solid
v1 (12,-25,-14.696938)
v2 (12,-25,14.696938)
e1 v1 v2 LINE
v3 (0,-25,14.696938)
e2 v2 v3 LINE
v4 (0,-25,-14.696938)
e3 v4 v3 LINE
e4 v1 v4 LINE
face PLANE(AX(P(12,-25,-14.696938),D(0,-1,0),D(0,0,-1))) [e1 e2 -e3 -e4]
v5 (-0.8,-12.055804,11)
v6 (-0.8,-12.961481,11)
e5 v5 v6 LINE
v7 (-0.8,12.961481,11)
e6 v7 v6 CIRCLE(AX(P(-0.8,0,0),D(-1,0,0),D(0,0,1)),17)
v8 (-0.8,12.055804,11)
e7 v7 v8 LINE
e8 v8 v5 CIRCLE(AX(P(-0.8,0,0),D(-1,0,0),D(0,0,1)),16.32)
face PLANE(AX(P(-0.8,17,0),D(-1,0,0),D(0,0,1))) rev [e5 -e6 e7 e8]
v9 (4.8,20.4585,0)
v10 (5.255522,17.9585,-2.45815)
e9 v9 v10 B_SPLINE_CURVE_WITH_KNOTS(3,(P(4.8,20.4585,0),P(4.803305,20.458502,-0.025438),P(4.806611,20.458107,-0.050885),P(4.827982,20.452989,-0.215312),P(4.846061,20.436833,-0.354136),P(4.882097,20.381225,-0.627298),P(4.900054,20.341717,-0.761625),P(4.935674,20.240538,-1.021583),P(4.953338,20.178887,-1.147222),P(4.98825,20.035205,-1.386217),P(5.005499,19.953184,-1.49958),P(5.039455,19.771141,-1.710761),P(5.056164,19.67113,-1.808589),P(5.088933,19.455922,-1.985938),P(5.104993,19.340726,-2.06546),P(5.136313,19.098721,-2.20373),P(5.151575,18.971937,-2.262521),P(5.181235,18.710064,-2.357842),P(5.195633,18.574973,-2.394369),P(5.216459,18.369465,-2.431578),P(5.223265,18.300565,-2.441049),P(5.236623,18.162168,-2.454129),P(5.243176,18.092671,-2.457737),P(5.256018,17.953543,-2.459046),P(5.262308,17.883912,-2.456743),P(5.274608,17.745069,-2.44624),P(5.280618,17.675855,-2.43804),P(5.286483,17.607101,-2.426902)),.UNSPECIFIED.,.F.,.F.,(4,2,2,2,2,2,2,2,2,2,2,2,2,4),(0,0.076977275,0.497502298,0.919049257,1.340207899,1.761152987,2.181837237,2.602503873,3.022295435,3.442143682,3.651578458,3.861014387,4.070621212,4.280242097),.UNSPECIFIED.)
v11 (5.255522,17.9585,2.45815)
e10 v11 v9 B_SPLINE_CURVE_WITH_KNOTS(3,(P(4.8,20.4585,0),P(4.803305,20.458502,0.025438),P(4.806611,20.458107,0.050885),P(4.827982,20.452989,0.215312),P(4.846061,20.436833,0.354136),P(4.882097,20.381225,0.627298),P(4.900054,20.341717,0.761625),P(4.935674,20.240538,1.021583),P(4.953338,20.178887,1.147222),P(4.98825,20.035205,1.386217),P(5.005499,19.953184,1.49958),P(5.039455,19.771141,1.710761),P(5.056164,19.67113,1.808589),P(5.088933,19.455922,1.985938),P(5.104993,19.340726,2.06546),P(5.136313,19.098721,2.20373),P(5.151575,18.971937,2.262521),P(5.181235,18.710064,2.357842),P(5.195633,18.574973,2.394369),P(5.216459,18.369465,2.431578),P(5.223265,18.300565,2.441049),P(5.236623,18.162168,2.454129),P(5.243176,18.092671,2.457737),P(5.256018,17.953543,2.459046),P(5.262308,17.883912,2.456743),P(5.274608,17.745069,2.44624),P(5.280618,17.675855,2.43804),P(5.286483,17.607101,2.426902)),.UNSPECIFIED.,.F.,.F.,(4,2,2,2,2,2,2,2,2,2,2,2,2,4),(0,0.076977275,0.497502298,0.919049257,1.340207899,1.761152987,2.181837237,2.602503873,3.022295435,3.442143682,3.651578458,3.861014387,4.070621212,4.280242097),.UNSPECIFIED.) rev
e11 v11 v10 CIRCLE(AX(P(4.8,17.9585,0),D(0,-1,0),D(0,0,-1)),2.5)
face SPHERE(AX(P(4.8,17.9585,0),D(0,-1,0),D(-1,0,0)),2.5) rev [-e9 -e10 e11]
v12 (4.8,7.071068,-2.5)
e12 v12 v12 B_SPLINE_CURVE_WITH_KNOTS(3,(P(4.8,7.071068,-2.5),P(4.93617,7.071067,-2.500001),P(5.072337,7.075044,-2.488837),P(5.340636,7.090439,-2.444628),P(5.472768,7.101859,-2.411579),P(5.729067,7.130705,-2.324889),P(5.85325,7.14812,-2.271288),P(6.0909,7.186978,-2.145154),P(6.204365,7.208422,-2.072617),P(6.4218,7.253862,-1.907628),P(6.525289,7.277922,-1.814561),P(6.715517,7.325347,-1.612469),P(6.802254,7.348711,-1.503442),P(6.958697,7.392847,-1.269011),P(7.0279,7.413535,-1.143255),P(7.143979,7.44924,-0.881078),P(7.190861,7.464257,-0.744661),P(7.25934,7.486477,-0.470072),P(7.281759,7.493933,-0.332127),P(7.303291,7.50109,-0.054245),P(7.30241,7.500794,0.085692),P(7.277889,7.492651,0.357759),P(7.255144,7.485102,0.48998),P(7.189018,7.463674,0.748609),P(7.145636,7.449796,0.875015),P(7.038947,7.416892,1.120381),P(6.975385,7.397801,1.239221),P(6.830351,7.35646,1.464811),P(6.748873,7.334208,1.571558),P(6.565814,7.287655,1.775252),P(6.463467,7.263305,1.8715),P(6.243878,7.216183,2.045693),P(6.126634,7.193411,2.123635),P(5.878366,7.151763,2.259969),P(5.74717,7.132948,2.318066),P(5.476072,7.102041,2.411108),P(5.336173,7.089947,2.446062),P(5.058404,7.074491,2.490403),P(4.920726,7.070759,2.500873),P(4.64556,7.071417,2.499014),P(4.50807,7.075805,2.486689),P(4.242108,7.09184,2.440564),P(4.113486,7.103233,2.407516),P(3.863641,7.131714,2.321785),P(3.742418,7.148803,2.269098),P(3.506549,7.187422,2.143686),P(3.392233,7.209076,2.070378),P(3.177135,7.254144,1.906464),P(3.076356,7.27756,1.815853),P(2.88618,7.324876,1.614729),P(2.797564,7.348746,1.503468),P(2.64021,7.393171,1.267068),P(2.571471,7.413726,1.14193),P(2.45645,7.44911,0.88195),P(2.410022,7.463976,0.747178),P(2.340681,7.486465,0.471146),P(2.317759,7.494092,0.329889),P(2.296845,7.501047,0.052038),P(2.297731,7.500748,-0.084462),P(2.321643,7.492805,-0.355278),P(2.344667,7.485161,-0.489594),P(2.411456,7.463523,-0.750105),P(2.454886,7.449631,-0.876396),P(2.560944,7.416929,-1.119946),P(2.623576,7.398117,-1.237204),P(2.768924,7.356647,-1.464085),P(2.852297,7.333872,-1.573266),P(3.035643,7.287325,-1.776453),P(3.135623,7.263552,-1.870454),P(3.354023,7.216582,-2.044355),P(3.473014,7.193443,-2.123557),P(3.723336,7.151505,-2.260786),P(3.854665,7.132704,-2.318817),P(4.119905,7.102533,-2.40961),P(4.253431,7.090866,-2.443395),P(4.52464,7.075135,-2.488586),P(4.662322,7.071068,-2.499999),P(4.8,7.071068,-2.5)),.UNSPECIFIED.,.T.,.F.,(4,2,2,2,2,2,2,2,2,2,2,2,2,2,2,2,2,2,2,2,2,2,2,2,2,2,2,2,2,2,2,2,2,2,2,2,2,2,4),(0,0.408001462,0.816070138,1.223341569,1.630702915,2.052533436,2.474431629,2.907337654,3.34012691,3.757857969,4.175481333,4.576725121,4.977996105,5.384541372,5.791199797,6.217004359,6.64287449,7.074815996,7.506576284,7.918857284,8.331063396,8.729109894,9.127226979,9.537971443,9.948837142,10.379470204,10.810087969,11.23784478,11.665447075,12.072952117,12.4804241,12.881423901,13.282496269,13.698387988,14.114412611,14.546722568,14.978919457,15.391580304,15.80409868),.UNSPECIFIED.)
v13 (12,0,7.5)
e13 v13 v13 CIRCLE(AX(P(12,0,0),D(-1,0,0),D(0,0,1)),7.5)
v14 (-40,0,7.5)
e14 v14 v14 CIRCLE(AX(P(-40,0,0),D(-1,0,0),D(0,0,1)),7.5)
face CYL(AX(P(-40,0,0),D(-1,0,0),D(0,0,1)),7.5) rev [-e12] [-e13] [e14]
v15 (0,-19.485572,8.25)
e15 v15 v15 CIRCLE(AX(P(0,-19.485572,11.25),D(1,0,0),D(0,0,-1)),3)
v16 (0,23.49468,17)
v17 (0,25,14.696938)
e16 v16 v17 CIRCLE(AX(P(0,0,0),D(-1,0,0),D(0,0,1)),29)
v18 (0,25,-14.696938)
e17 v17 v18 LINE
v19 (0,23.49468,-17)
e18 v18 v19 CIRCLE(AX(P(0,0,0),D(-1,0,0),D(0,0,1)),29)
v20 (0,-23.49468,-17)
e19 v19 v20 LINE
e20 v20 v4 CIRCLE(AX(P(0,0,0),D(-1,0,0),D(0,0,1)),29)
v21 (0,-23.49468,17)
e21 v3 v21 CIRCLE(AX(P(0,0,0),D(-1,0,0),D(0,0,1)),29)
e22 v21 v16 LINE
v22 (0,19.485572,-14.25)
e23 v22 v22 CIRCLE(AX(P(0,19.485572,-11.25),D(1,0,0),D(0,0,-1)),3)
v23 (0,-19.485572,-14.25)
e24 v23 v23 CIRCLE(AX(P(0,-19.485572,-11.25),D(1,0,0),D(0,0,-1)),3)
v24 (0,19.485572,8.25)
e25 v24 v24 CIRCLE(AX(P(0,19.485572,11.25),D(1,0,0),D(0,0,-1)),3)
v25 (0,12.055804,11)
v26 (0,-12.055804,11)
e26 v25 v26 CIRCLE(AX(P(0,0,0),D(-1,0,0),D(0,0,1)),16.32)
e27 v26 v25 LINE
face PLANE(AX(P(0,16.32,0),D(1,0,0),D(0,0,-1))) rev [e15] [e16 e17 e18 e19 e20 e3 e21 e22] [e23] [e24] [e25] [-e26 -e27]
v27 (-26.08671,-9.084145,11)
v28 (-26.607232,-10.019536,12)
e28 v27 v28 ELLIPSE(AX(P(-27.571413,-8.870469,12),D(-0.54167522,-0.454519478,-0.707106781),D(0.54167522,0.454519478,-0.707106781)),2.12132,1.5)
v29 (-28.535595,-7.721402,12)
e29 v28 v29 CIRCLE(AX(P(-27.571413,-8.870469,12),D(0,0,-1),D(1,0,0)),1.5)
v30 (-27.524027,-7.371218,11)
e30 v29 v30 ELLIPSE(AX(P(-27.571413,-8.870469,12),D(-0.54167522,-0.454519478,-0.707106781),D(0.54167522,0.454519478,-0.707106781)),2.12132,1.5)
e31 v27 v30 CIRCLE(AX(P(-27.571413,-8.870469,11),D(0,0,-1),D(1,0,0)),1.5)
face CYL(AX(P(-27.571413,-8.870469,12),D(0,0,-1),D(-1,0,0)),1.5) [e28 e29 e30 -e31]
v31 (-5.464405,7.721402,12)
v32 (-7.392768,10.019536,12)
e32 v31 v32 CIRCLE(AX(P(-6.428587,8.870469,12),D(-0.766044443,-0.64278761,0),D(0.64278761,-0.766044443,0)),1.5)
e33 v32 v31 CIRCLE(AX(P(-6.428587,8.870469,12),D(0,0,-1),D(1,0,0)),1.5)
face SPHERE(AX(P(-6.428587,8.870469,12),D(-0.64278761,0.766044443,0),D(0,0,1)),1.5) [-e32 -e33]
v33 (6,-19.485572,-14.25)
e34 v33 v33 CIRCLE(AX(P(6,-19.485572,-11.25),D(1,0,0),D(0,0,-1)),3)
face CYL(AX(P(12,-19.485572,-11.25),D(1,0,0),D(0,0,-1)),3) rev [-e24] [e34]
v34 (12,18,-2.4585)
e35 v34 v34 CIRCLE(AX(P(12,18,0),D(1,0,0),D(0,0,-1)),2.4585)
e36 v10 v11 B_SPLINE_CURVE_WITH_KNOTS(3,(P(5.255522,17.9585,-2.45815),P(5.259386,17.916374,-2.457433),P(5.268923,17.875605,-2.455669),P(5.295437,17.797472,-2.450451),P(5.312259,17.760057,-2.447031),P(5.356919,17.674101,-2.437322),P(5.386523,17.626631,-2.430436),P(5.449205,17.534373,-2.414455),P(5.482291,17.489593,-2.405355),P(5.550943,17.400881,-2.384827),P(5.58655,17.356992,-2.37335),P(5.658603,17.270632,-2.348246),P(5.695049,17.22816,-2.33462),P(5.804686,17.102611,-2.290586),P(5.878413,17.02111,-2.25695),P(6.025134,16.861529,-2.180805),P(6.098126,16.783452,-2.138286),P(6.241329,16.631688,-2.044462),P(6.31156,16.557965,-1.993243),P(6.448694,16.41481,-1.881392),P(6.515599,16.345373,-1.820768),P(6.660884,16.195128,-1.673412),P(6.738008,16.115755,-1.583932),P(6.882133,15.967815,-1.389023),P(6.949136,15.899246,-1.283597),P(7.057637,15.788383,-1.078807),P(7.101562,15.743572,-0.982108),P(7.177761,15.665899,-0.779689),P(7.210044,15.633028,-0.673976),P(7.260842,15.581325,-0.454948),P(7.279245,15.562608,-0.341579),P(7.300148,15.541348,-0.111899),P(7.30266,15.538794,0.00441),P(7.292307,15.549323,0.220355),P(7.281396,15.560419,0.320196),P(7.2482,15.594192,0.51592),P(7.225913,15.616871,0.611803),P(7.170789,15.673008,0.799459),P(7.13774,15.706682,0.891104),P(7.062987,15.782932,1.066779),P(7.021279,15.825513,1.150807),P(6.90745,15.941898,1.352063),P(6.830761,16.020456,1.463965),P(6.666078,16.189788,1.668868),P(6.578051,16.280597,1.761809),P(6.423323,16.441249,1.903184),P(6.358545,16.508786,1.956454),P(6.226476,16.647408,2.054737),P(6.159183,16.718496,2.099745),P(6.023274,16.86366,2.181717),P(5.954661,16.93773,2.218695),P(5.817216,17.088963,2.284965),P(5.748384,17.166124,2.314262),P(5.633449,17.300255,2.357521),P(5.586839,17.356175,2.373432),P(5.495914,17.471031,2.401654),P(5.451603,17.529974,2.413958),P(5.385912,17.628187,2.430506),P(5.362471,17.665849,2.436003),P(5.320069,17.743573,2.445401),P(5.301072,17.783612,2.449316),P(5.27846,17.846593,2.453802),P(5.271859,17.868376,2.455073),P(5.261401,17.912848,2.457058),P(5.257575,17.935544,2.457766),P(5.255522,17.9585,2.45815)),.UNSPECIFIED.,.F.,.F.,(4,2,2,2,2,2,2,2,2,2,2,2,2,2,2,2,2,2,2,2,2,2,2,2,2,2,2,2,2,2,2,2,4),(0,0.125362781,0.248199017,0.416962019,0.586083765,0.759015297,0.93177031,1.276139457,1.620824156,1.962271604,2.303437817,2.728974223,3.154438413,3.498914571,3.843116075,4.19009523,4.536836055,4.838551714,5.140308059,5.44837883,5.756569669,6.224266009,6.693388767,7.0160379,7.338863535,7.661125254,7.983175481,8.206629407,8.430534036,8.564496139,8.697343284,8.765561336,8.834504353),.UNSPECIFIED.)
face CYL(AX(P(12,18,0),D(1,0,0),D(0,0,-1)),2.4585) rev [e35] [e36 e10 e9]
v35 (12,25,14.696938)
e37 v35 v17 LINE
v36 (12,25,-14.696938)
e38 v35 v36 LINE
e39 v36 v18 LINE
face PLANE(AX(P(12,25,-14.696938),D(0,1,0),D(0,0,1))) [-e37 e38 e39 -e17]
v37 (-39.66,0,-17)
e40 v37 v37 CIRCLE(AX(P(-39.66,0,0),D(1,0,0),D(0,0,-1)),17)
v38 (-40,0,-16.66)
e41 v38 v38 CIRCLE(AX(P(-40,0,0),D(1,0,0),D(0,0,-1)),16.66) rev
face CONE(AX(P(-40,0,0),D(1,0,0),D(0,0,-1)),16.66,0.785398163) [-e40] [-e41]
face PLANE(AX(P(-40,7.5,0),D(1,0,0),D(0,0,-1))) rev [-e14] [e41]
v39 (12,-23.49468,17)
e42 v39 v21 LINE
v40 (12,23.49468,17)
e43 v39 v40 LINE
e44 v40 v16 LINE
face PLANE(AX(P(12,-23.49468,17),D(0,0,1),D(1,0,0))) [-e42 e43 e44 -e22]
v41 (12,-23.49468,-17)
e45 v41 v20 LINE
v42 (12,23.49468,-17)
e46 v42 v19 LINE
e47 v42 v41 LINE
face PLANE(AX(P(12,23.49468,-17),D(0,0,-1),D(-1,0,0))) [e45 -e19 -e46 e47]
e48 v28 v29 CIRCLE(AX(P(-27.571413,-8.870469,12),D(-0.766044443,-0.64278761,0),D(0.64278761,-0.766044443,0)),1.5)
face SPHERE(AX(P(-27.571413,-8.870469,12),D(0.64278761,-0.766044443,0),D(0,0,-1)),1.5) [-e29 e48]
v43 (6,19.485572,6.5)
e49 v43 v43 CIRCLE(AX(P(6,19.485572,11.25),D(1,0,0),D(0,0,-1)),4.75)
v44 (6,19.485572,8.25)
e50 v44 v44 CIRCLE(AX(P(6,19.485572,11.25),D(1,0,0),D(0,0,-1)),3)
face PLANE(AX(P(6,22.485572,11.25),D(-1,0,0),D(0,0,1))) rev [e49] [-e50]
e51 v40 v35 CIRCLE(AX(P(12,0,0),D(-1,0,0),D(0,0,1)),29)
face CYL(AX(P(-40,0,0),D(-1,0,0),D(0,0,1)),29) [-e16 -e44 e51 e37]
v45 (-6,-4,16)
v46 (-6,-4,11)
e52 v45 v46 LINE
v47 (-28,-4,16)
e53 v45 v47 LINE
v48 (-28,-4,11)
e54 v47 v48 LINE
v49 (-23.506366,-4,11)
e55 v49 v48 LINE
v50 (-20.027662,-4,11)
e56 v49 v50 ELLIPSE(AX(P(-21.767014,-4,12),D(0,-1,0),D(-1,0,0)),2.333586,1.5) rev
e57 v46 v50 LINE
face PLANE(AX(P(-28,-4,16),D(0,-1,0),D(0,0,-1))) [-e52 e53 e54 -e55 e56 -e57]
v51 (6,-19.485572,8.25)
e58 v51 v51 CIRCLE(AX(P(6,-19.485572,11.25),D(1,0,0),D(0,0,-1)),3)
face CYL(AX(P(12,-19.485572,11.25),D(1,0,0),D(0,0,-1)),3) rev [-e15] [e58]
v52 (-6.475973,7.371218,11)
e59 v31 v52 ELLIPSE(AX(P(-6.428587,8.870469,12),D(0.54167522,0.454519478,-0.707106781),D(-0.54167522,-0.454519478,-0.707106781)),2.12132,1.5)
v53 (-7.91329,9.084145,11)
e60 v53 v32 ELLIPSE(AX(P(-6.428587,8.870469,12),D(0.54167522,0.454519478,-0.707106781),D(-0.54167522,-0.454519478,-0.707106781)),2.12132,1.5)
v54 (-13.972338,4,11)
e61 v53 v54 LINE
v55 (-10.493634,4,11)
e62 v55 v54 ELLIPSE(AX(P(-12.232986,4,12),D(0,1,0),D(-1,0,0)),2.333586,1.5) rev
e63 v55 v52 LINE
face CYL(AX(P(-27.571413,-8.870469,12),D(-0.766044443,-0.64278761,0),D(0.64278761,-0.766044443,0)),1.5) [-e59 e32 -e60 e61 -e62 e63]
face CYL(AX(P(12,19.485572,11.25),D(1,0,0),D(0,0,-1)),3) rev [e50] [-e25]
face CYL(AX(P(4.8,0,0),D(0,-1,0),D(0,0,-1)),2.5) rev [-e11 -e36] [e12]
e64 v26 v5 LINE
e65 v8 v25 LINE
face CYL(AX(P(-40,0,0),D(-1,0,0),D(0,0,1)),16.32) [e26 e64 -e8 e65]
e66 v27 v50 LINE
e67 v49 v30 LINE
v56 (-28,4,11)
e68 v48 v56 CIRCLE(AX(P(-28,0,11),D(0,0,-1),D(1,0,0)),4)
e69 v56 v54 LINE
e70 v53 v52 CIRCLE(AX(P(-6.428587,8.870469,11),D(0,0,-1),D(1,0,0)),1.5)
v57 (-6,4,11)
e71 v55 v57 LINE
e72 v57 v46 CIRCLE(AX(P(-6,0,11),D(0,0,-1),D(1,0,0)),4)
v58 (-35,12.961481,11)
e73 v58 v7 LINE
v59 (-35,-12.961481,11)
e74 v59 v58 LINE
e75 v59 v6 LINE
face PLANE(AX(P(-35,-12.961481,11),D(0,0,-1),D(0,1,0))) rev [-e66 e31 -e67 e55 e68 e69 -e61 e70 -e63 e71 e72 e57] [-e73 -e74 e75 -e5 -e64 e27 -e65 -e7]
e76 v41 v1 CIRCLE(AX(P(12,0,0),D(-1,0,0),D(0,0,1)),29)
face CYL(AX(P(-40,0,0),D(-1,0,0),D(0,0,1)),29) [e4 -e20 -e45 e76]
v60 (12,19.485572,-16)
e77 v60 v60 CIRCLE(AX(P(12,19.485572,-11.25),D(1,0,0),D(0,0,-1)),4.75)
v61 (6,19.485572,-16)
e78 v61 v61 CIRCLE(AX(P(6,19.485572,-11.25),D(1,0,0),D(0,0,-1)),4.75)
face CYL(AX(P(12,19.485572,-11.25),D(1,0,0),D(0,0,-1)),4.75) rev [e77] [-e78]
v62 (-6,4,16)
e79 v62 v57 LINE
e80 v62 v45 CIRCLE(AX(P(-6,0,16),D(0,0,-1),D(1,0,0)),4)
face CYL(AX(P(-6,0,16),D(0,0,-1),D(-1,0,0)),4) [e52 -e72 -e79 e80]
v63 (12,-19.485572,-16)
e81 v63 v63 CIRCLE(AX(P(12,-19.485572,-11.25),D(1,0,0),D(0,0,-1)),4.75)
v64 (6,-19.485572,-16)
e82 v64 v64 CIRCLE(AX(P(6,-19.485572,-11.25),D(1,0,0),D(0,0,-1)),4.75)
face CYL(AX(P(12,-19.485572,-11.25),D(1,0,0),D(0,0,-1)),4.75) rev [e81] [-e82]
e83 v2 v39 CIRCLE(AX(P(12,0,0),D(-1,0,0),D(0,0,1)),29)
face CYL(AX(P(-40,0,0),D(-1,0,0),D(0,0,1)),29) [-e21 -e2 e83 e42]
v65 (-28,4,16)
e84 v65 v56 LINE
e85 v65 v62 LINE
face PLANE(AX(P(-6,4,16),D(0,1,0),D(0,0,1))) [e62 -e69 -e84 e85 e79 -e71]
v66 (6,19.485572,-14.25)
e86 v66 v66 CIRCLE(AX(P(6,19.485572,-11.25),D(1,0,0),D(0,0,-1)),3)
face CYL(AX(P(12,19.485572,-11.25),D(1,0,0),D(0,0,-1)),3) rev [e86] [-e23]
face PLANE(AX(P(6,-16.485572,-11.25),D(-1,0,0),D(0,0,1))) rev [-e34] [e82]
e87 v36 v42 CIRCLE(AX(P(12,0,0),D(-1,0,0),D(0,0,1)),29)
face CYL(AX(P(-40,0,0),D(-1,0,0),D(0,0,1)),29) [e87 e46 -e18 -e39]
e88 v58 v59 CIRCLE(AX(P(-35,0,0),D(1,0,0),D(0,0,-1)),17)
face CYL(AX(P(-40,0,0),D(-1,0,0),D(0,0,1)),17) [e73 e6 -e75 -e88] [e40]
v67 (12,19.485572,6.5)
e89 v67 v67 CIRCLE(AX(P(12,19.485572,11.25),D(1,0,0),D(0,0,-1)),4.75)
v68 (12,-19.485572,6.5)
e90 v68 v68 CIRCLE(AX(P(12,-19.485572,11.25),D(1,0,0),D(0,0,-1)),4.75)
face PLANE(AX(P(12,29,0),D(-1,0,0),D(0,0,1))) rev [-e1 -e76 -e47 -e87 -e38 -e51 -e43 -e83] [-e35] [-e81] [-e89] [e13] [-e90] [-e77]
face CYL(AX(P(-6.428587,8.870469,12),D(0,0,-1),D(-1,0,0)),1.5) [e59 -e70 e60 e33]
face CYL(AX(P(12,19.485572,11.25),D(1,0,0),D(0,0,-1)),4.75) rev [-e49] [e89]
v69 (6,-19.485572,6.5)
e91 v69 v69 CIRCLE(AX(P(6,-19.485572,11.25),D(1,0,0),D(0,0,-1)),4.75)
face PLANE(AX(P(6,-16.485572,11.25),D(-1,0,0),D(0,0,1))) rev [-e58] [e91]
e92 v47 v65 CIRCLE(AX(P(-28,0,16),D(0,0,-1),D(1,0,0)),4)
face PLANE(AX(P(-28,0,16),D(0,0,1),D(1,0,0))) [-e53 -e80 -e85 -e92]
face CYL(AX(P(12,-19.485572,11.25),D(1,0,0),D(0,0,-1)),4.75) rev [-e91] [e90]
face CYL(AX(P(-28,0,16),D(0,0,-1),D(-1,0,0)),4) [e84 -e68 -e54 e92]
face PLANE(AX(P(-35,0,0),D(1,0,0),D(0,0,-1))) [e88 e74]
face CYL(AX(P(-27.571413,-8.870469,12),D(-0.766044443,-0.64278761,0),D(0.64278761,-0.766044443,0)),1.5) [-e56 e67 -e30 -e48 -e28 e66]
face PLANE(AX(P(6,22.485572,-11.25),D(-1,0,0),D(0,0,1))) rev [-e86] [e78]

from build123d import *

# Parameters (mm, degrees)
CUT_EXTRUDE1_DEPTH                 = 58.28874235
CHAMFER1_SIZE                      = 0.34
SOCKET_HEAD_CAP_SCREW1_D           = 6
SOCKET_HEAD_CAP_SCREW1_CBORE_D     = 9.5
SOCKET_HEAD_CAP_SCREW1_CBORE_DEPTH = 6
CUT_EXTRUDE2_DEPTH                 = 35
BOSS_EXTRUDE1_DEPTH                = 5
SKETCH7_R                          = 1.5
BOSS_EXTRUDE2_DEPTH                = 1
REVOLVE3_ANGLE                     = 90
REVOLVE4_ANGLE                     = 90
TAP1_START                         = 4.7999999
TAP1_OUTLINE_R                     = 2.4585
TAP1_DEPTH                         = 7.2000001


# Read off the part's stored shape, not the designer's step: Tap1
with BuildPart() as part:
    # Sketch1 → Revolve1 (revolve)
    with BuildSketch(Plane.XY, mode=Mode.PRIVATE) as revolve1_sk:
        Polygon((0, 29), (12, 29), (12, 7.5), (-40, 7.5), (-40, 17), (-0.8, 17), (-0.8, 16.32), (0, 16.32), align=None)
    revolve(revolve1_sk.sketch.rotate(Axis((-40, 0, 0), (1, 0, 0)), 90), axis=Axis((-40, 0, 0), (1, 0, 0)))

    # Sketch2 → Cut-Extrude1 (cut, through all)
    with BuildSketch(Plane(origin=(0, 0, 0), x_dir=(0, 0, -1), z_dir=(1, 0, 0))):
        with BuildLine():
            Line((14.696938457, 25), (-14.696938457, 25))
            ThreePointArc((-14.696938457, 25), (0, 29), (14.696938457, 25))
        make_face()
        with BuildLine():
            Line((17, 23.494680249), (17, -23.494680249))
            ThreePointArc((17, -23.494680249), (29, 0), (17, 23.494680249))
        make_face()
        with BuildLine():
            Line((14.696938457, -25), (-14.696938457, -25))
            ThreePointArc((-14.696938457, -25), (0, -29), (14.696938457, -25))
        make_face()
        with BuildLine():
            Line((-17, -23.494680249), (-17, 23.494680249))
            ThreePointArc((-17, 23.494680249), (-29, 0), (-17, -23.494680249))
        make_face()
    extrude(amount=CUT_EXTRUDE1_DEPTH, mode=Mode.SUBTRACT)

    # Chamfer1
    chamfer1_edges = [part.edges().sort_by_distance(p)[0] for p in [
        (-40, 0, -17),
    ]]
    chamfer(chamfer1_edges, length=CHAMFER1_SIZE)

    # Socket Head Cap Screw1 (through all)
    with Locations(Plane(origin=(12, 0, 0), x_dir=(0, 0, -1), z_dir=(1, 0, 0))):
        with Locations((-11.25, 19.485571585), (11.25, -19.485571585), (-11.25, -19.485571585), (11.25, 19.485571585)):
            CounterBoreHole(SOCKET_HEAD_CAP_SCREW1_D / 2, SOCKET_HEAD_CAP_SCREW1_CBORE_D / 2, SOCKET_HEAD_CAP_SCREW1_CBORE_DEPTH)

    # Sketch5 → Cut-Extrude2 (cut)
    with BuildSketch(Plane(origin=(0, 0, 0), x_dir=(0, 0, -1), z_dir=(1, 0, 0))):
        with BuildLine():
            Line((-11, -12.961481397), (-11, 12.961481397))
            ThreePointArc((-11, 12.961481397), (-17, 0), (-11, -12.961481397))
        make_face()
    extrude(amount=-CUT_EXTRUDE2_DEPTH, mode=Mode.SUBTRACT)

    # Sketch6 → Boss-Extrude1 (add)
    with BuildSketch(Plane(origin=(0, 0, 11), x_dir=(-1, 0, 0), z_dir=(0, 0, -1))):
        with BuildLine():
            Line((6, 4), (28, 4))
            ThreePointArc((28, 4), (32, 0), (28, -4))
            Line((28, -4), (6, -4))
            ThreePointArc((6, -4), (2, 0), (6, 4))
        make_face()
    extrude(amount=-BOSS_EXTRUDE1_DEPTH)

    # Sketch7 → Boss-Extrude2 (add)
    with BuildSketch(Plane(origin=(0, 0, 11), x_dir=(-1, 0, 0), z_dir=(0, 0, -1))):
        with Locations(Location((27.571413315, -8.870469014, 0), (0, 0, 180))):
            Circle(SKETCH7_R)
        with Locations(Location((6.428586685, 8.870469014, 0), (0, 0, 180))):
            Circle(SKETCH7_R)
    extrude(amount=-BOSS_EXTRUDE2_DEPTH)

    # Sketch8 → Revolve2 (revolve)
    with BuildSketch(Plane.XY.offset(12)):
        Polygon((-27.571413315, -8.870469014), (-6.428586685, 8.870469014), (-7.392768099, 10.019535678), (-28.53559473, -7.721402349), align=None)
    revolve(axis=Axis((-27.571413315, -8.870469014, 12), (0.7660444431189788, 0.6427876096865385, 0)))

    # Sketch9 → Revolve3 (revolve)
    with BuildSketch(Plane.XY.offset(12)):
        with BuildLine():
            Line((-26.607231901, -10.019535678), (-28.53559473, -7.721402349))
            ThreePointArc((-28.53559473, -7.721402349), (-28.72047998, -9.834650428), (-26.607231901, -10.019535678))
        make_face()
    revolve(axis=Axis((-26.607231901, -10.019535678, 12), (-0.6427876096865375, 0.7660444431189796, 0)), revolution_arc=REVOLVE3_ANGLE)

    # Sketch10 → Revolve4 (revolve)
    with BuildSketch(Plane.XY.offset(12)):
        with BuildLine():
            Line((-7.392768099, 10.019535678), (-5.46440527, 7.721402349))
            ThreePointArc((-5.46440527, 7.721402349), (-5.27952002, 9.834650428), (-7.392768099, 10.019535678))
        make_face()
    revolve(axis=Axis((-7.392768099, 10.019535678, 12), (0.6427876096865389, -0.7660444431189785, 0)), revolution_arc=REVOLVE4_ANGLE)

    # Sketch11 → Cut-Revolve1 (revolve, cut)
    with BuildSketch(Plane.XY, mode=Mode.PRIVATE) as cut_revolve1_sk:
        with BuildLine():
            Line((2.3, 0), (4.8, 0))
            Line((4.8, 0), (4.8, 20.4585))
            ThreePointArc((4.8, 20.4585), (3.032233047, 19.726266953), (2.3, 17.9585))
            Line((2.3, 17.9585), (2.3, 0))
        make_face()
    revolve(cut_revolve1_sk.sketch.rotate(Axis((4.8, 0, 0), (0, 1, 0)), 270), axis=Axis((4.8, 0, 0), (0, 1, 0)), mode=Mode.SUBTRACT)

    # Tap1 outline → Tap1 (cut)
    with BuildSketch(Plane.YZ.offset(TAP1_START)):
        with Locations((18, 0)):
            Circle(TAP1_OUTLINE_R)
    extrude(amount=TAP1_DEPTH, mode=Mode.SUBTRACT)


solid = part.part
